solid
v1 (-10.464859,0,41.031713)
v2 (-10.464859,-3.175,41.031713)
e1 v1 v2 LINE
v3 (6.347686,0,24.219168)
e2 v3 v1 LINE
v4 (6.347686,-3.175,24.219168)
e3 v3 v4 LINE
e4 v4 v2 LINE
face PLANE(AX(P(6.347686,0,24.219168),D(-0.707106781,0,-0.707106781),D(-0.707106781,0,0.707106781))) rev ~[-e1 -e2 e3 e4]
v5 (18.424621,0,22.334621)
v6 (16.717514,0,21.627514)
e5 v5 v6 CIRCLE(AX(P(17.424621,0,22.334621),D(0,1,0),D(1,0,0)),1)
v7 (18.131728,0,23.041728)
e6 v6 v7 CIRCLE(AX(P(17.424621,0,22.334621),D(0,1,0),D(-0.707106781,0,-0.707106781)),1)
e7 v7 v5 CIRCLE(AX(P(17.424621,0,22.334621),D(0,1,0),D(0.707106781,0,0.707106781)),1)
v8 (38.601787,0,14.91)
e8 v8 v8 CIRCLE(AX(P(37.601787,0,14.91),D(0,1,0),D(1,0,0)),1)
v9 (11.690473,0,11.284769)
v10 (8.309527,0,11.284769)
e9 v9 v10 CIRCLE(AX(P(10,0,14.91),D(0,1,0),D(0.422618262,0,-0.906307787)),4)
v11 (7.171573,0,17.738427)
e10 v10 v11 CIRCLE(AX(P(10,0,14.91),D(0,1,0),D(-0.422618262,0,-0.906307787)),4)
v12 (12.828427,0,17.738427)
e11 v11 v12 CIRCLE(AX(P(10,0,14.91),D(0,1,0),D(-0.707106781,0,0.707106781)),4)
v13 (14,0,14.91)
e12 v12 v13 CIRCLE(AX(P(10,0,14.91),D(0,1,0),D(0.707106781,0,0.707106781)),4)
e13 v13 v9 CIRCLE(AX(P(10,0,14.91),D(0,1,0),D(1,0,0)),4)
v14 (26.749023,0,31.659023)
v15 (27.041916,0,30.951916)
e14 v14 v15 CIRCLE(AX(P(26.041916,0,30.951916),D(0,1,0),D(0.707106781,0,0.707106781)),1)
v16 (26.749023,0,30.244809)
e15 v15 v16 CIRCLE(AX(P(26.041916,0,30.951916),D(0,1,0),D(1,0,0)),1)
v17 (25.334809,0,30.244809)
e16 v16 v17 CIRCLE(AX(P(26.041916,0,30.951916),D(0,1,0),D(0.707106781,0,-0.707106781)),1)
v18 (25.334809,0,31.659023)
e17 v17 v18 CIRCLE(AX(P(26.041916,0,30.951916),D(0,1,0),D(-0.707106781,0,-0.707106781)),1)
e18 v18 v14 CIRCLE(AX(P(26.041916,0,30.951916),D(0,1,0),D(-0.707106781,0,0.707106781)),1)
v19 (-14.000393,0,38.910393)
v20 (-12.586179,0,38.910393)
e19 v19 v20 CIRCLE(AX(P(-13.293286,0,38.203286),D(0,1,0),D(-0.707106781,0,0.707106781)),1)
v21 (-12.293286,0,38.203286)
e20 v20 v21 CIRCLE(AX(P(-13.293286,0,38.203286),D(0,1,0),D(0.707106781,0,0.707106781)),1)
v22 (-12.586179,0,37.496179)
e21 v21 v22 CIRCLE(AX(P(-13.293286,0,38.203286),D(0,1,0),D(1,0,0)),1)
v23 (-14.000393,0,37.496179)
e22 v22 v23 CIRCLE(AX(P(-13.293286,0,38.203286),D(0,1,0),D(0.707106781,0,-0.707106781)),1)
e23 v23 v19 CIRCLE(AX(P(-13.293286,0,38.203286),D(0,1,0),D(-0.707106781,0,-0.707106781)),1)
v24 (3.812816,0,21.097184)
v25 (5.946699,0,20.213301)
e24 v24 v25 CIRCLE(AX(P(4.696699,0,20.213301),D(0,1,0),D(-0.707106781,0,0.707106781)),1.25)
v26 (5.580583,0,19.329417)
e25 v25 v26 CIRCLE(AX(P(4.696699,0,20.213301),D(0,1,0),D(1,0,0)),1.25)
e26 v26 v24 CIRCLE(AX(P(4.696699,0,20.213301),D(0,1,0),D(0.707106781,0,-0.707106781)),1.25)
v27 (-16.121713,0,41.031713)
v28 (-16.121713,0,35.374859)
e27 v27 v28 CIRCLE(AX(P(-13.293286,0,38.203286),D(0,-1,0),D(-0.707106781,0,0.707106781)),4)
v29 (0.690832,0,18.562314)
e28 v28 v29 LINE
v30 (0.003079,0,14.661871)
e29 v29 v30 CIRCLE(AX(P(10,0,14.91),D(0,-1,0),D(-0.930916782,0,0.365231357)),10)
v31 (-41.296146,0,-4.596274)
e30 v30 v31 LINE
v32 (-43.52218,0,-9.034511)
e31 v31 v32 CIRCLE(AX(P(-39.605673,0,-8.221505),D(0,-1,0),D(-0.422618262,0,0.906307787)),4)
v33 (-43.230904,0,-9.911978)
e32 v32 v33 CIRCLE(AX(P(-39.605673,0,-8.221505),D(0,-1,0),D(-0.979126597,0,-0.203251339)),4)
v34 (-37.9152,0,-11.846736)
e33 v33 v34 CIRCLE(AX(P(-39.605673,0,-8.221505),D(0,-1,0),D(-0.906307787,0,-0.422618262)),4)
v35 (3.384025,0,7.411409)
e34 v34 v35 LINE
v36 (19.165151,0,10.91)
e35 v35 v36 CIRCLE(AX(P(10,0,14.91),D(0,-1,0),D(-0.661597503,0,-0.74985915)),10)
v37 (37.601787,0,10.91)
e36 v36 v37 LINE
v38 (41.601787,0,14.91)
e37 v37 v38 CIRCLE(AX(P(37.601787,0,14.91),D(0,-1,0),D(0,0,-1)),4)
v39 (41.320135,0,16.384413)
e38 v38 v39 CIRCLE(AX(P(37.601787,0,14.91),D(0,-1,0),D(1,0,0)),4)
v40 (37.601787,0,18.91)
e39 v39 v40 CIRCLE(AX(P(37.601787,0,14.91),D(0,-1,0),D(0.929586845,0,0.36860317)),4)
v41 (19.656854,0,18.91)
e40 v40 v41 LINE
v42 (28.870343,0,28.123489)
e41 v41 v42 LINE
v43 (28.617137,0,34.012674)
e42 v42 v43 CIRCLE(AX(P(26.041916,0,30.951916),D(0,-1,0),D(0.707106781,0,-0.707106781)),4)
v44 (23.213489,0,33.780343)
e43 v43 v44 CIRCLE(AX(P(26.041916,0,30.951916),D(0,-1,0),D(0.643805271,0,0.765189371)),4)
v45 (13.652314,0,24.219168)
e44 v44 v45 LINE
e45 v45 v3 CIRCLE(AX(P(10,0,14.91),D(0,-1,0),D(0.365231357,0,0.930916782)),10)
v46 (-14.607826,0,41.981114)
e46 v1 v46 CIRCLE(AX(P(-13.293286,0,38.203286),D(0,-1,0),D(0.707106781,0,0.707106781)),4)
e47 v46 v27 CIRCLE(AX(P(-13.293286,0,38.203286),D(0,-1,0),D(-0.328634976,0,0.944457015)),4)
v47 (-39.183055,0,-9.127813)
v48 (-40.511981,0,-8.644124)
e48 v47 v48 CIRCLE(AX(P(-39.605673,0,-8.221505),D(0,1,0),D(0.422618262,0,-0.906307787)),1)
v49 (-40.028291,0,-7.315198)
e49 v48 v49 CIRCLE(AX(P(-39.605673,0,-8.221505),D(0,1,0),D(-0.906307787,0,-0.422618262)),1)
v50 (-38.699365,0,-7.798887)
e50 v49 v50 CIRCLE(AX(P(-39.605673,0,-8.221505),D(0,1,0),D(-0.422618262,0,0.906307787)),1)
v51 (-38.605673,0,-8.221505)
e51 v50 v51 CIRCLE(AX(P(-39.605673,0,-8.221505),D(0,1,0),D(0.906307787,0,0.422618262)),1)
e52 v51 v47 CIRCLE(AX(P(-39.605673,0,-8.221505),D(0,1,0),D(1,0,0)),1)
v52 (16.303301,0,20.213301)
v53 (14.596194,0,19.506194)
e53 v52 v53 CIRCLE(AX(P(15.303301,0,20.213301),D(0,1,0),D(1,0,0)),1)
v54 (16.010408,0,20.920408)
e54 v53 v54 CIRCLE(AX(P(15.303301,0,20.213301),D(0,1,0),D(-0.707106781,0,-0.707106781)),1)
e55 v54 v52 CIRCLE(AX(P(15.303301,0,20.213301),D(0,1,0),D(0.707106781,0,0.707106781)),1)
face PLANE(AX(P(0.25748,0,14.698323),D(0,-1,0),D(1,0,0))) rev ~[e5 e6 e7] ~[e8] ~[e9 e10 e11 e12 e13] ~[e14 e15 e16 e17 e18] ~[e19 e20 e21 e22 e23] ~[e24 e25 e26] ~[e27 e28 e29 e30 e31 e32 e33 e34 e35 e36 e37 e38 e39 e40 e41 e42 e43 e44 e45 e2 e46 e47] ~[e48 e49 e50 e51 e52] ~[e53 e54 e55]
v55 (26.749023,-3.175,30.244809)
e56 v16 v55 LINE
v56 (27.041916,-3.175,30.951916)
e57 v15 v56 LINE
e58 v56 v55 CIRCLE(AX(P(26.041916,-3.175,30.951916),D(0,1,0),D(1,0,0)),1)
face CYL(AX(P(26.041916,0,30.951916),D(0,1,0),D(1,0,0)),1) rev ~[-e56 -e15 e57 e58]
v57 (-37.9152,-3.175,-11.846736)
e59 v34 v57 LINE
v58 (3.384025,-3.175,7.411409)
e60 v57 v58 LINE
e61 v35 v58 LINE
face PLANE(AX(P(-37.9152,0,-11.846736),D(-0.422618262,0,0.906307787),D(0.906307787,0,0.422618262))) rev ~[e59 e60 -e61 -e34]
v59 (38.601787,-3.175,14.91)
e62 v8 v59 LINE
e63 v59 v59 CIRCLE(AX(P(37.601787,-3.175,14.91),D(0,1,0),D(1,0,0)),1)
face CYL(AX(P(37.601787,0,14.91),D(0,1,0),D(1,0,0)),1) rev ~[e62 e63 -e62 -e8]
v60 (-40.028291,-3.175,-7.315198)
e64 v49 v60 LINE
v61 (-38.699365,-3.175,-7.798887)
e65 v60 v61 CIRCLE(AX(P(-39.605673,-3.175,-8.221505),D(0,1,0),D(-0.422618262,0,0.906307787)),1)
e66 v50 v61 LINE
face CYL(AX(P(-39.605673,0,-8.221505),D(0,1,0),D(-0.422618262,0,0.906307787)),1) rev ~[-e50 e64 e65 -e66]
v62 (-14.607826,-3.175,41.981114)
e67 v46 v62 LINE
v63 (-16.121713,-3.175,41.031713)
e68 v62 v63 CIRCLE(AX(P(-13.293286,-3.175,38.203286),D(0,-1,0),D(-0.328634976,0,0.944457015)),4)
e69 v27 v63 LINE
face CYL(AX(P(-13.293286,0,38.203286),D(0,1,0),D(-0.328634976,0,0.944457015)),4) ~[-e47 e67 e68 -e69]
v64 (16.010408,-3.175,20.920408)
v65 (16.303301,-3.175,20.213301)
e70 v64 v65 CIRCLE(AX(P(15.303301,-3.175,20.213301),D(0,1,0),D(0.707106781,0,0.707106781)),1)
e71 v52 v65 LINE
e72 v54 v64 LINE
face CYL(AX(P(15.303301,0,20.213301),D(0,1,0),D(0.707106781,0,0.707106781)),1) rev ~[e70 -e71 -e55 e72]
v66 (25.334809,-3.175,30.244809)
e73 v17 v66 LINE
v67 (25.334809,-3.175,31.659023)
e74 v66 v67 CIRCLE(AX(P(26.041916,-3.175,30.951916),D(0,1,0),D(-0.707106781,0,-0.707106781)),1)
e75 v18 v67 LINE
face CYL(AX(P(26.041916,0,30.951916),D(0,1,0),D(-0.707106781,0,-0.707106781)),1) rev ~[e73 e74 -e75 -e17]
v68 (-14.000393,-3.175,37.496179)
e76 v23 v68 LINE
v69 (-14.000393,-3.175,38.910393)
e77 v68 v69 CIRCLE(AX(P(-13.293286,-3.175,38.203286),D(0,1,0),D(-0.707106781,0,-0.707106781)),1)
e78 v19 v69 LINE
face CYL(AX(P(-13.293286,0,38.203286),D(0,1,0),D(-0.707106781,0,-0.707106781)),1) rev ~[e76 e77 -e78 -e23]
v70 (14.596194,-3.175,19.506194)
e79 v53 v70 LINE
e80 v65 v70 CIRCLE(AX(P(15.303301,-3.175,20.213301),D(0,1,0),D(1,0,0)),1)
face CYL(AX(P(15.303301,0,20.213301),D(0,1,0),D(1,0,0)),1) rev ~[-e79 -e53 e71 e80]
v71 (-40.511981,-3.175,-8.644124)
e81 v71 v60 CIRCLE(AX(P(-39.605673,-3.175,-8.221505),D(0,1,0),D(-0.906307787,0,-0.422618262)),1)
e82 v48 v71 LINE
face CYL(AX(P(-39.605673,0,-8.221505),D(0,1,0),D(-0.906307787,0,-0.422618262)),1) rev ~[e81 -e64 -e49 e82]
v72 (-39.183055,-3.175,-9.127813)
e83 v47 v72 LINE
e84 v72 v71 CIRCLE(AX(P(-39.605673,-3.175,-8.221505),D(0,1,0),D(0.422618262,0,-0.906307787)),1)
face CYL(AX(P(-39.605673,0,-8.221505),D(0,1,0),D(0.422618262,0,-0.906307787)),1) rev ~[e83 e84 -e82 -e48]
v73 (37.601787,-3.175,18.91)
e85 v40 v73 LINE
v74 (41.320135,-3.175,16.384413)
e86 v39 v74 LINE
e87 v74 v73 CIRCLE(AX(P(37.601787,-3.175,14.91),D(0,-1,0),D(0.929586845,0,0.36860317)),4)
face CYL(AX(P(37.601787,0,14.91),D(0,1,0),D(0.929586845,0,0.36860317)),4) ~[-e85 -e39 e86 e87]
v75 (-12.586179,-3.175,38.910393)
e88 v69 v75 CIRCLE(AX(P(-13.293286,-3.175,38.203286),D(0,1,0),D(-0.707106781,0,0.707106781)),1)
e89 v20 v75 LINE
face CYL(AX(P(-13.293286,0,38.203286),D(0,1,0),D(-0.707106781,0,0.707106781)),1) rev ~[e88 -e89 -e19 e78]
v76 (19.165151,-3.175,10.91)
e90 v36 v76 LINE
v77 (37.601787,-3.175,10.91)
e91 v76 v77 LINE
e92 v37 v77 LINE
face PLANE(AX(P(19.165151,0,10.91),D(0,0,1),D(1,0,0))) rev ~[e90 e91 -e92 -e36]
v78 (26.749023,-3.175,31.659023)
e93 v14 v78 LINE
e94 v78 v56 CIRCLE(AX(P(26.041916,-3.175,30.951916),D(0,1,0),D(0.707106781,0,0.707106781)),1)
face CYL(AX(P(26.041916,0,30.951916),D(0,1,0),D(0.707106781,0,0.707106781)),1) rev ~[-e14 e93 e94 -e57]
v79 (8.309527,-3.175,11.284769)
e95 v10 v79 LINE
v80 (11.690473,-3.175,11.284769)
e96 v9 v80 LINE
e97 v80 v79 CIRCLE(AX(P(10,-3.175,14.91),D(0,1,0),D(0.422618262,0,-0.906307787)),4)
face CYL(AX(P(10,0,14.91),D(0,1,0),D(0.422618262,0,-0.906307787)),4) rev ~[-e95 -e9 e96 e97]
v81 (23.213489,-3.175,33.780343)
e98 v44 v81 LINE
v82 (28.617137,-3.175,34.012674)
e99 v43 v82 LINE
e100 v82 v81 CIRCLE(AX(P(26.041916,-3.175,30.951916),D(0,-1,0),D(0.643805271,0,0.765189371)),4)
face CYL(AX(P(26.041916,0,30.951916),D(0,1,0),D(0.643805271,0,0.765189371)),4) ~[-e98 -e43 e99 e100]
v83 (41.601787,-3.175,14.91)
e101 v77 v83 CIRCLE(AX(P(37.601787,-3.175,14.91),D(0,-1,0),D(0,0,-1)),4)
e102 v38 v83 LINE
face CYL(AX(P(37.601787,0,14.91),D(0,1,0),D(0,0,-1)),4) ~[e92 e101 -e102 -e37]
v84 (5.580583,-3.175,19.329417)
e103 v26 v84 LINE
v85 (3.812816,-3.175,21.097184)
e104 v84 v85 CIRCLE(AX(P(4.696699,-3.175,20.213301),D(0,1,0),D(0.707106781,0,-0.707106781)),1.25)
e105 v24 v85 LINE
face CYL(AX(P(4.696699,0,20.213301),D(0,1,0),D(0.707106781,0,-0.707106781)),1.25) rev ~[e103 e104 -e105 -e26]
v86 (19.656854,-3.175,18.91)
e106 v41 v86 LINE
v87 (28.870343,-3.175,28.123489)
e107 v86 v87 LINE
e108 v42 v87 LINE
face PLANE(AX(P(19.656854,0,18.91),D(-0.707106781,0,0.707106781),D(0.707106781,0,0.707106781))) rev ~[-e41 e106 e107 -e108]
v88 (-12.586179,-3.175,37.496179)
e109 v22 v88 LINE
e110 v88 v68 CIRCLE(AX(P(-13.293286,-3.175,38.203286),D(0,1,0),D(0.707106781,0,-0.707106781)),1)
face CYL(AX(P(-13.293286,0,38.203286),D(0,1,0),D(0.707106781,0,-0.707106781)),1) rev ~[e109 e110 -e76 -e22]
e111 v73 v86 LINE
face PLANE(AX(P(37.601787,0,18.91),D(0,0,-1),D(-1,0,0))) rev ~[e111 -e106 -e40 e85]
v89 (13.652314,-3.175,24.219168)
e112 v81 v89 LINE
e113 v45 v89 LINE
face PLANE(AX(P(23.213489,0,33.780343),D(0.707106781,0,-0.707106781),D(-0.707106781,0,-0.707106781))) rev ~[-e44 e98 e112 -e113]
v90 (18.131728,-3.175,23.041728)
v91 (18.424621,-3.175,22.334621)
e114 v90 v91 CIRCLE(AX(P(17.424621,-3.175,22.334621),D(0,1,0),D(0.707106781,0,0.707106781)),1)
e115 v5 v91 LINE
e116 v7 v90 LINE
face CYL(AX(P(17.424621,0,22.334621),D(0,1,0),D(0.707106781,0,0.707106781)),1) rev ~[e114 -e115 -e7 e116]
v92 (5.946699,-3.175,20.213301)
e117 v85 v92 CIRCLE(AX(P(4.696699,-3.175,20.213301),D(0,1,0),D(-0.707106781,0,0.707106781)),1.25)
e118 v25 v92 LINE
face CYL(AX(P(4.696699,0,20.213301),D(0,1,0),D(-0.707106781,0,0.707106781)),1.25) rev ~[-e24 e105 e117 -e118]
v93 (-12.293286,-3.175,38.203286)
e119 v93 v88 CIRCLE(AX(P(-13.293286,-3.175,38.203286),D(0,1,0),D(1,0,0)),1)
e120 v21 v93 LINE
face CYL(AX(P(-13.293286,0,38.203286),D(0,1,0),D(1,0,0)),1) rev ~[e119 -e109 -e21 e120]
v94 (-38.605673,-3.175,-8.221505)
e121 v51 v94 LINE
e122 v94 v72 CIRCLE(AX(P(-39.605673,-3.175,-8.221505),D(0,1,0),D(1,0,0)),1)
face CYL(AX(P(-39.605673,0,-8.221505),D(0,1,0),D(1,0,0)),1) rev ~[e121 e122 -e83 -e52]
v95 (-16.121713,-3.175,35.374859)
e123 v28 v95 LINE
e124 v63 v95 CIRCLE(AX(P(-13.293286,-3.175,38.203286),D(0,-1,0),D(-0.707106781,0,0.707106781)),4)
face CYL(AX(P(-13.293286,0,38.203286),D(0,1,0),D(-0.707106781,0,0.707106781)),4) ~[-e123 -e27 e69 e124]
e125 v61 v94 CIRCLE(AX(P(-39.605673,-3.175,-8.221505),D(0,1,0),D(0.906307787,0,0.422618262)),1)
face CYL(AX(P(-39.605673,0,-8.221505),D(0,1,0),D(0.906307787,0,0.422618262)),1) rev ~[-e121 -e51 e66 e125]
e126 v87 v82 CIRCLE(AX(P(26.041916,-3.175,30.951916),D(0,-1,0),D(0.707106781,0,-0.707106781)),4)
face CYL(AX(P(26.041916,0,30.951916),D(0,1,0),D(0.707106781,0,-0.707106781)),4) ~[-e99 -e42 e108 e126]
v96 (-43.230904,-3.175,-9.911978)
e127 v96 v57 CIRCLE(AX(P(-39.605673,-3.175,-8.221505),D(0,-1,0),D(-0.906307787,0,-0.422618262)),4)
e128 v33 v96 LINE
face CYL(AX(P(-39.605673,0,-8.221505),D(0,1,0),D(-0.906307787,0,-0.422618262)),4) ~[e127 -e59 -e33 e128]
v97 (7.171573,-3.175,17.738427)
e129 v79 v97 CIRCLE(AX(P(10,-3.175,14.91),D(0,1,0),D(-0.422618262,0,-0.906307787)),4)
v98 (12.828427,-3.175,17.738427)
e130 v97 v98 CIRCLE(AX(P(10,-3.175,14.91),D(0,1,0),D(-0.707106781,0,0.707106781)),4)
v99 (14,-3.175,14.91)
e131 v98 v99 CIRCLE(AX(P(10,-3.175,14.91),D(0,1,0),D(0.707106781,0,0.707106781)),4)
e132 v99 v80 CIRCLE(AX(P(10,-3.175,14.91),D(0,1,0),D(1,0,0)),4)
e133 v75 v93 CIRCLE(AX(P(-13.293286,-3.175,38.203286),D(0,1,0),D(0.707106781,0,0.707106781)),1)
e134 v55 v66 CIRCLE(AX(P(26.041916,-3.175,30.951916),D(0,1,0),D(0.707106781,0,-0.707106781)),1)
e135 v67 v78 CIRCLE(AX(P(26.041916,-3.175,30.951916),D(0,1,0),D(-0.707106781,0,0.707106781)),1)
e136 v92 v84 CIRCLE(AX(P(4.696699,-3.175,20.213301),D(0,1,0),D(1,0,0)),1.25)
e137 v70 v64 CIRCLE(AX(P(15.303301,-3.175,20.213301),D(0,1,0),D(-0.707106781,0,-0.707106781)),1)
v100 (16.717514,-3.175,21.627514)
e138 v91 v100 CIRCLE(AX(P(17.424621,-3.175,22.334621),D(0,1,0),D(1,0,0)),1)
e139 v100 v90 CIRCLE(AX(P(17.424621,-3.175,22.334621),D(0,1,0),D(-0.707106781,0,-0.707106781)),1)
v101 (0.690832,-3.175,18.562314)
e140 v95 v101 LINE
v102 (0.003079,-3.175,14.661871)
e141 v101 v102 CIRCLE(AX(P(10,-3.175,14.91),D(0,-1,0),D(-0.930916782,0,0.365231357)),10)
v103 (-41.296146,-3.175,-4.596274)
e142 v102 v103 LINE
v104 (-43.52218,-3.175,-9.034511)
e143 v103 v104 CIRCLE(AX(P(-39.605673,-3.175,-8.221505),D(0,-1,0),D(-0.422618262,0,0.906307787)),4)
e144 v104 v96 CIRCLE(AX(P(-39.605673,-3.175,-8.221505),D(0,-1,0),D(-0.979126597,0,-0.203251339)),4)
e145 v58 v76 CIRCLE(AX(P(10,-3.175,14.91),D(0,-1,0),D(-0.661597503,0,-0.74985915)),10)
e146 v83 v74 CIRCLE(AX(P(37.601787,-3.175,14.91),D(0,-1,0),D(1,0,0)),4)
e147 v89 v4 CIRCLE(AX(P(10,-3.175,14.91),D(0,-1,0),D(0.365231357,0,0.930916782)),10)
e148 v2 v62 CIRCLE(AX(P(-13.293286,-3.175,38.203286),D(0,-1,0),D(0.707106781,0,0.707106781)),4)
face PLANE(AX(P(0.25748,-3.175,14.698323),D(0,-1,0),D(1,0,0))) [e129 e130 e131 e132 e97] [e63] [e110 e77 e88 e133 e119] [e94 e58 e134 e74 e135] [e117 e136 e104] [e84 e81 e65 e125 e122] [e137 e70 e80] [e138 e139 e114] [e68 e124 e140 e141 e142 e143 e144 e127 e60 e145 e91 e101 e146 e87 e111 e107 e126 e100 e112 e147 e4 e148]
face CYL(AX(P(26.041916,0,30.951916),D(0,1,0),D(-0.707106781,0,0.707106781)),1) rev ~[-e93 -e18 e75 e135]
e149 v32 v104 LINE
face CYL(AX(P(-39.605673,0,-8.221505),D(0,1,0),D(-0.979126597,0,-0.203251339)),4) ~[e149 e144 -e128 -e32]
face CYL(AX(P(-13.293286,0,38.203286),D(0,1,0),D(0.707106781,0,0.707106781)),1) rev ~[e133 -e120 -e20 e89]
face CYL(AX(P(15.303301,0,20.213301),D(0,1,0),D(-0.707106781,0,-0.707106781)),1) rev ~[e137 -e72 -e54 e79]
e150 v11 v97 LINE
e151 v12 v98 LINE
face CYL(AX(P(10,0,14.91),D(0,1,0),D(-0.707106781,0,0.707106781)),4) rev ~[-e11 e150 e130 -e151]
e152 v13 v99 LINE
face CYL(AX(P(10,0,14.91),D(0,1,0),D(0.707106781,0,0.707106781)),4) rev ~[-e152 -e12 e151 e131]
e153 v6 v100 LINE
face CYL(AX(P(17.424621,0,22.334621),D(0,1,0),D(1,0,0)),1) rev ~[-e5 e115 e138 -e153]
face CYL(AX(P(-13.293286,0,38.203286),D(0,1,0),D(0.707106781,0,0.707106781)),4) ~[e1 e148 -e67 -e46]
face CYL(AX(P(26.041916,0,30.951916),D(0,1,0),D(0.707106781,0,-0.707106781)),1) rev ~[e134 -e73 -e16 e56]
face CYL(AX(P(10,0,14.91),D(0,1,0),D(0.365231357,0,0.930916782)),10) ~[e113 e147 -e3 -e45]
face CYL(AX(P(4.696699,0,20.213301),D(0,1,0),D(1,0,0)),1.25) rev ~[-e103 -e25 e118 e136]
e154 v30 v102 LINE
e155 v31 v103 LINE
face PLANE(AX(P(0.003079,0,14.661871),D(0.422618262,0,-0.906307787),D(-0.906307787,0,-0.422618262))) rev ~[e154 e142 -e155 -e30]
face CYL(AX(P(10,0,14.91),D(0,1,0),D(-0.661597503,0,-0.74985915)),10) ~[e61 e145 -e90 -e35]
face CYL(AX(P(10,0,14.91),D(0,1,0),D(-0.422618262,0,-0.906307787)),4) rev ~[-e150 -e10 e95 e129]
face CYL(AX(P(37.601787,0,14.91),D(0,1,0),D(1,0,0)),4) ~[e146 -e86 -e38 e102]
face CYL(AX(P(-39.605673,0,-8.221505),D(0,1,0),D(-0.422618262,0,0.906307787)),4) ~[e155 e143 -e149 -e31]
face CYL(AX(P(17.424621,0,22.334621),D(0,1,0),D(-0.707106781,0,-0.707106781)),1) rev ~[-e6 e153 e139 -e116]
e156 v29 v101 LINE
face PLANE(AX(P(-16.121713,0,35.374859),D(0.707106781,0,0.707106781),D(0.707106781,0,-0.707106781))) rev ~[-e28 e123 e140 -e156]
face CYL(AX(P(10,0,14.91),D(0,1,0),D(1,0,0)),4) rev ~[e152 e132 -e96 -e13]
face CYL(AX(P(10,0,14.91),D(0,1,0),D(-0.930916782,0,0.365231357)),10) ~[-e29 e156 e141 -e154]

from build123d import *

# Parameters (mm, degrees)
F1_DEPTH = 3.175


# Not quite as in the source:
# - a length typed as a fraction of an inch, garbled in the dataset ("3 / 203.2 mm" for 3/8 in), is restored
# - a feature names something its author has since deleted; it is built from what else it names


with BuildPart() as f1:
    # F0 (on Front) → F1 (new body)
    with BuildSketch(Plane.XZ):
        with BuildLine():
            ThreePointArc((41.6017871916, 14.91), (41.5307431297, 15.6605366323), (41.3201345734, 16.3844126791))
            ThreePointArc((41.3201345734, 16.3844126791), (39.8492690362, 18.218900929), (37.6017871916, 18.91))
            Line((37.6017871916, 18.91), (19.6568542495, 18.91))
            Line((19.6568542495, 18.91), (28.870343186, 28.1234889365))
            ThreePointArc((28.870343186, 28.1234889365), (30.0382240231, 31.1237376944), (28.617137145, 34.0126735442))
            ThreePointArc((28.617137145, 34.0126735442), (25.870094428, 34.9482240231), (23.2134889365, 33.780343186))
            Line((23.2134889365, 33.780343186), (13.6523135737, 24.2191678232))
            ThreePointArc((13.6523135737, 24.2191678232), (10, 24.91), (6.3476864263, 24.2191678232))
            Line((6.3476864263, 24.2191678232), (-10.4648587405, 41.03171299))
            ThreePointArc((-10.4648587405, 41.03171299), (-12.3998071782, 42.1022210835), (-14.6078257676, 41.9811139245))
            ThreePointArc((-14.6078257676, 41.9811139245), (-15.418464559, 41.5920342359), (-16.12171299, 41.03171299))
            ThreePointArc((-16.12171299, 41.03171299), (-17.2932858653, 38.2032858653), (-16.12171299, 35.3748587405))
            Line((-16.12171299, 35.3748587405), (0.6908321768, 18.5623135737))
            ThreePointArc((0.6908321768, 18.5623135737), (0.1519224699, 16.6464817767), (0.003078879, 14.6618707992))
            Line((0.003078879, 14.6618707992), (-41.296146258, -4.5962741581))
            ThreePointArc((-41.296146258, -4.5962741581), (-43.1811508594, -6.4281956325), (-43.5221795995, -9.0345106623))
            ThreePointArc((-43.5221795995, -9.0345106623), (-43.4019791332, -9.4816883664), (-43.2309043592, -9.9119783532))
            ThreePointArc((-43.2309043592, -9.9119783532), (-40.9737537843, -11.9802757894), (-37.9152001641, -11.8467364544))
            Line((-37.9152001641, -11.8467364544), (3.3840249729, 7.4114085029))
            ThreePointArc((3.3840249729, 7.4114085029), (12.1643961394, 5.1470399288), (19.1651513899, 10.91))
            Line((19.1651513899, 10.91), (37.6017871916, 10.91))
            ThreePointArc((37.6017871916, 10.91), (40.4302143163, 12.0815728753), (41.6017871916, 14.91))
        make_face()
        with BuildLine():
            ThreePointArc((-40.5119809981, -8.644123568), (-40.5453658318, -7.8794851629), (-40.0282914728, -7.3151975192))
            ThreePointArc((-40.0282914728, -7.3151975192), (-39.2636530677, -7.2818126855), (-38.699365424, -7.7988870445))
            ThreePointArc((-38.699365424, -7.7988870445), (-38.6293772039, -8.0050656923), (-38.605673211, -8.2215053062))
            ThreePointArc((-38.605673211, -8.2215053062), (-38.7622817652, -8.7588049146), (-39.1830549493, -9.1278130933))
            ThreePointArc((-39.1830549493, -9.1278130933), (-39.9476933544, -9.161197927), (-40.5119809981, -8.644123568))
        make_face(mode=Mode.SUBTRACT)
        with BuildLine():
            ThreePointArc((-12.2932858653, 38.2032858653), (-12.3694063328, 37.8206024329), (-12.5861790841, 37.4961790841))
            ThreePointArc((-12.5861790841, 37.4961790841), (-13.2932858653, 37.2032858653), (-14.0003926465, 37.4961790841))
            ThreePointArc((-14.0003926465, 37.4961790841), (-14.2932858653, 38.2032858653), (-14.0003926465, 38.9103926465))
            ThreePointArc((-14.0003926465, 38.9103926465), (-13.2932858653, 39.2032858653), (-12.5861790841, 38.9103926465))
            ThreePointArc((-12.5861790841, 38.9103926465), (-12.3694063328, 38.5859692976), (-12.2932858653, 38.2032858653))
        make_face(mode=Mode.SUBTRACT)
        with BuildLine():
            ThreePointArc((14, 14.91), (13.3735657833, 12.7608015666), (11.690473047, 11.2847688519))
            ThreePointArc((11.690473047, 11.2847688519), (10, 10.91), (8.309526953, 11.2847688519))
            ThreePointArc((8.309526953, 11.2847688519), (6.060768988, 14.2154072893), (7.1715728753, 17.7384271247))
            ThreePointArc((7.1715728753, 17.7384271247), (10, 18.91), (12.8284271247, 17.7384271247))
            ThreePointArc((12.8284271247, 17.7384271247), (13.69551813, 16.4407337295), (14, 14.91))
        make_face(mode=Mode.SUBTRACT)
        with BuildLine():
            ThreePointArc((5.9466991411, 20.2133008589), (5.8515485567, 19.7349465684), (5.5805826176, 19.3294173824))
            ThreePointArc((5.5805826176, 19.3294173824), (3.8128156646, 19.3294173824), (3.8128156646, 21.0971843354))
            ThreePointArc((3.8128156646, 21.0971843354), (5.1750534316, 21.3681502745), (5.9466991411, 20.2133008589))
        make_face(mode=Mode.SUBTRACT)
        with BuildLine():
            ThreePointArc((16.3033008589, 20.2133008589), (15.6859842913, 19.2894213264), (14.5961940777, 19.5061940777))
            ThreePointArc((14.5961940777, 19.5061940777), (14.5961940777, 20.9204076401), (16.0104076401, 20.9204076401))
            ThreePointArc((16.0104076401, 20.9204076401), (16.2271803914, 20.5959842913), (16.3033008589, 20.2133008589))
        make_face(mode=Mode.SUBTRACT)
        with BuildLine():
            ThreePointArc((36.6017871916, 14.91), (37.6017871916, 15.91), (38.6017871916, 14.91))
            ThreePointArc((38.6017871916, 14.91), (37.6017871916, 13.91), (36.6017871916, 14.91))
        make_face(mode=Mode.SUBTRACT)
        with BuildLine():
            ThreePointArc((18.4246212025, 22.3346212025), (17.8073046348, 21.4107416699), (16.7175144213, 21.6275144213))
            ThreePointArc((16.7175144213, 21.6275144213), (16.7175144213, 23.0417279836), (18.1317279836, 23.0417279836))
            ThreePointArc((18.1317279836, 23.0417279836), (18.348500735, 22.7173046348), (18.4246212025, 22.3346212025))
        make_face(mode=Mode.SUBTRACT)
        with BuildLine():
            ThreePointArc((26.7490228424, 30.24480928), (26.0419160612, 29.9519160612), (25.33480928, 30.24480928))
            ThreePointArc((25.33480928, 30.24480928), (25.0419160612, 30.9519160612), (25.33480928, 31.6590228424))
            ThreePointArc((25.33480928, 31.6590228424), (26.0419160612, 31.9519160612), (26.7490228424, 31.6590228424))
            ThreePointArc((26.7490228424, 31.6590228424), (26.9657955937, 31.3345994936), (27.0419160612, 30.9519160612))
            ThreePointArc((27.0419160612, 30.9519160612), (26.9657955937, 30.5692326289), (26.7490228424, 30.24480928))
        make_face(mode=Mode.SUBTRACT)
    extrude(amount=F1_DEPTH)


solid = f1.part
